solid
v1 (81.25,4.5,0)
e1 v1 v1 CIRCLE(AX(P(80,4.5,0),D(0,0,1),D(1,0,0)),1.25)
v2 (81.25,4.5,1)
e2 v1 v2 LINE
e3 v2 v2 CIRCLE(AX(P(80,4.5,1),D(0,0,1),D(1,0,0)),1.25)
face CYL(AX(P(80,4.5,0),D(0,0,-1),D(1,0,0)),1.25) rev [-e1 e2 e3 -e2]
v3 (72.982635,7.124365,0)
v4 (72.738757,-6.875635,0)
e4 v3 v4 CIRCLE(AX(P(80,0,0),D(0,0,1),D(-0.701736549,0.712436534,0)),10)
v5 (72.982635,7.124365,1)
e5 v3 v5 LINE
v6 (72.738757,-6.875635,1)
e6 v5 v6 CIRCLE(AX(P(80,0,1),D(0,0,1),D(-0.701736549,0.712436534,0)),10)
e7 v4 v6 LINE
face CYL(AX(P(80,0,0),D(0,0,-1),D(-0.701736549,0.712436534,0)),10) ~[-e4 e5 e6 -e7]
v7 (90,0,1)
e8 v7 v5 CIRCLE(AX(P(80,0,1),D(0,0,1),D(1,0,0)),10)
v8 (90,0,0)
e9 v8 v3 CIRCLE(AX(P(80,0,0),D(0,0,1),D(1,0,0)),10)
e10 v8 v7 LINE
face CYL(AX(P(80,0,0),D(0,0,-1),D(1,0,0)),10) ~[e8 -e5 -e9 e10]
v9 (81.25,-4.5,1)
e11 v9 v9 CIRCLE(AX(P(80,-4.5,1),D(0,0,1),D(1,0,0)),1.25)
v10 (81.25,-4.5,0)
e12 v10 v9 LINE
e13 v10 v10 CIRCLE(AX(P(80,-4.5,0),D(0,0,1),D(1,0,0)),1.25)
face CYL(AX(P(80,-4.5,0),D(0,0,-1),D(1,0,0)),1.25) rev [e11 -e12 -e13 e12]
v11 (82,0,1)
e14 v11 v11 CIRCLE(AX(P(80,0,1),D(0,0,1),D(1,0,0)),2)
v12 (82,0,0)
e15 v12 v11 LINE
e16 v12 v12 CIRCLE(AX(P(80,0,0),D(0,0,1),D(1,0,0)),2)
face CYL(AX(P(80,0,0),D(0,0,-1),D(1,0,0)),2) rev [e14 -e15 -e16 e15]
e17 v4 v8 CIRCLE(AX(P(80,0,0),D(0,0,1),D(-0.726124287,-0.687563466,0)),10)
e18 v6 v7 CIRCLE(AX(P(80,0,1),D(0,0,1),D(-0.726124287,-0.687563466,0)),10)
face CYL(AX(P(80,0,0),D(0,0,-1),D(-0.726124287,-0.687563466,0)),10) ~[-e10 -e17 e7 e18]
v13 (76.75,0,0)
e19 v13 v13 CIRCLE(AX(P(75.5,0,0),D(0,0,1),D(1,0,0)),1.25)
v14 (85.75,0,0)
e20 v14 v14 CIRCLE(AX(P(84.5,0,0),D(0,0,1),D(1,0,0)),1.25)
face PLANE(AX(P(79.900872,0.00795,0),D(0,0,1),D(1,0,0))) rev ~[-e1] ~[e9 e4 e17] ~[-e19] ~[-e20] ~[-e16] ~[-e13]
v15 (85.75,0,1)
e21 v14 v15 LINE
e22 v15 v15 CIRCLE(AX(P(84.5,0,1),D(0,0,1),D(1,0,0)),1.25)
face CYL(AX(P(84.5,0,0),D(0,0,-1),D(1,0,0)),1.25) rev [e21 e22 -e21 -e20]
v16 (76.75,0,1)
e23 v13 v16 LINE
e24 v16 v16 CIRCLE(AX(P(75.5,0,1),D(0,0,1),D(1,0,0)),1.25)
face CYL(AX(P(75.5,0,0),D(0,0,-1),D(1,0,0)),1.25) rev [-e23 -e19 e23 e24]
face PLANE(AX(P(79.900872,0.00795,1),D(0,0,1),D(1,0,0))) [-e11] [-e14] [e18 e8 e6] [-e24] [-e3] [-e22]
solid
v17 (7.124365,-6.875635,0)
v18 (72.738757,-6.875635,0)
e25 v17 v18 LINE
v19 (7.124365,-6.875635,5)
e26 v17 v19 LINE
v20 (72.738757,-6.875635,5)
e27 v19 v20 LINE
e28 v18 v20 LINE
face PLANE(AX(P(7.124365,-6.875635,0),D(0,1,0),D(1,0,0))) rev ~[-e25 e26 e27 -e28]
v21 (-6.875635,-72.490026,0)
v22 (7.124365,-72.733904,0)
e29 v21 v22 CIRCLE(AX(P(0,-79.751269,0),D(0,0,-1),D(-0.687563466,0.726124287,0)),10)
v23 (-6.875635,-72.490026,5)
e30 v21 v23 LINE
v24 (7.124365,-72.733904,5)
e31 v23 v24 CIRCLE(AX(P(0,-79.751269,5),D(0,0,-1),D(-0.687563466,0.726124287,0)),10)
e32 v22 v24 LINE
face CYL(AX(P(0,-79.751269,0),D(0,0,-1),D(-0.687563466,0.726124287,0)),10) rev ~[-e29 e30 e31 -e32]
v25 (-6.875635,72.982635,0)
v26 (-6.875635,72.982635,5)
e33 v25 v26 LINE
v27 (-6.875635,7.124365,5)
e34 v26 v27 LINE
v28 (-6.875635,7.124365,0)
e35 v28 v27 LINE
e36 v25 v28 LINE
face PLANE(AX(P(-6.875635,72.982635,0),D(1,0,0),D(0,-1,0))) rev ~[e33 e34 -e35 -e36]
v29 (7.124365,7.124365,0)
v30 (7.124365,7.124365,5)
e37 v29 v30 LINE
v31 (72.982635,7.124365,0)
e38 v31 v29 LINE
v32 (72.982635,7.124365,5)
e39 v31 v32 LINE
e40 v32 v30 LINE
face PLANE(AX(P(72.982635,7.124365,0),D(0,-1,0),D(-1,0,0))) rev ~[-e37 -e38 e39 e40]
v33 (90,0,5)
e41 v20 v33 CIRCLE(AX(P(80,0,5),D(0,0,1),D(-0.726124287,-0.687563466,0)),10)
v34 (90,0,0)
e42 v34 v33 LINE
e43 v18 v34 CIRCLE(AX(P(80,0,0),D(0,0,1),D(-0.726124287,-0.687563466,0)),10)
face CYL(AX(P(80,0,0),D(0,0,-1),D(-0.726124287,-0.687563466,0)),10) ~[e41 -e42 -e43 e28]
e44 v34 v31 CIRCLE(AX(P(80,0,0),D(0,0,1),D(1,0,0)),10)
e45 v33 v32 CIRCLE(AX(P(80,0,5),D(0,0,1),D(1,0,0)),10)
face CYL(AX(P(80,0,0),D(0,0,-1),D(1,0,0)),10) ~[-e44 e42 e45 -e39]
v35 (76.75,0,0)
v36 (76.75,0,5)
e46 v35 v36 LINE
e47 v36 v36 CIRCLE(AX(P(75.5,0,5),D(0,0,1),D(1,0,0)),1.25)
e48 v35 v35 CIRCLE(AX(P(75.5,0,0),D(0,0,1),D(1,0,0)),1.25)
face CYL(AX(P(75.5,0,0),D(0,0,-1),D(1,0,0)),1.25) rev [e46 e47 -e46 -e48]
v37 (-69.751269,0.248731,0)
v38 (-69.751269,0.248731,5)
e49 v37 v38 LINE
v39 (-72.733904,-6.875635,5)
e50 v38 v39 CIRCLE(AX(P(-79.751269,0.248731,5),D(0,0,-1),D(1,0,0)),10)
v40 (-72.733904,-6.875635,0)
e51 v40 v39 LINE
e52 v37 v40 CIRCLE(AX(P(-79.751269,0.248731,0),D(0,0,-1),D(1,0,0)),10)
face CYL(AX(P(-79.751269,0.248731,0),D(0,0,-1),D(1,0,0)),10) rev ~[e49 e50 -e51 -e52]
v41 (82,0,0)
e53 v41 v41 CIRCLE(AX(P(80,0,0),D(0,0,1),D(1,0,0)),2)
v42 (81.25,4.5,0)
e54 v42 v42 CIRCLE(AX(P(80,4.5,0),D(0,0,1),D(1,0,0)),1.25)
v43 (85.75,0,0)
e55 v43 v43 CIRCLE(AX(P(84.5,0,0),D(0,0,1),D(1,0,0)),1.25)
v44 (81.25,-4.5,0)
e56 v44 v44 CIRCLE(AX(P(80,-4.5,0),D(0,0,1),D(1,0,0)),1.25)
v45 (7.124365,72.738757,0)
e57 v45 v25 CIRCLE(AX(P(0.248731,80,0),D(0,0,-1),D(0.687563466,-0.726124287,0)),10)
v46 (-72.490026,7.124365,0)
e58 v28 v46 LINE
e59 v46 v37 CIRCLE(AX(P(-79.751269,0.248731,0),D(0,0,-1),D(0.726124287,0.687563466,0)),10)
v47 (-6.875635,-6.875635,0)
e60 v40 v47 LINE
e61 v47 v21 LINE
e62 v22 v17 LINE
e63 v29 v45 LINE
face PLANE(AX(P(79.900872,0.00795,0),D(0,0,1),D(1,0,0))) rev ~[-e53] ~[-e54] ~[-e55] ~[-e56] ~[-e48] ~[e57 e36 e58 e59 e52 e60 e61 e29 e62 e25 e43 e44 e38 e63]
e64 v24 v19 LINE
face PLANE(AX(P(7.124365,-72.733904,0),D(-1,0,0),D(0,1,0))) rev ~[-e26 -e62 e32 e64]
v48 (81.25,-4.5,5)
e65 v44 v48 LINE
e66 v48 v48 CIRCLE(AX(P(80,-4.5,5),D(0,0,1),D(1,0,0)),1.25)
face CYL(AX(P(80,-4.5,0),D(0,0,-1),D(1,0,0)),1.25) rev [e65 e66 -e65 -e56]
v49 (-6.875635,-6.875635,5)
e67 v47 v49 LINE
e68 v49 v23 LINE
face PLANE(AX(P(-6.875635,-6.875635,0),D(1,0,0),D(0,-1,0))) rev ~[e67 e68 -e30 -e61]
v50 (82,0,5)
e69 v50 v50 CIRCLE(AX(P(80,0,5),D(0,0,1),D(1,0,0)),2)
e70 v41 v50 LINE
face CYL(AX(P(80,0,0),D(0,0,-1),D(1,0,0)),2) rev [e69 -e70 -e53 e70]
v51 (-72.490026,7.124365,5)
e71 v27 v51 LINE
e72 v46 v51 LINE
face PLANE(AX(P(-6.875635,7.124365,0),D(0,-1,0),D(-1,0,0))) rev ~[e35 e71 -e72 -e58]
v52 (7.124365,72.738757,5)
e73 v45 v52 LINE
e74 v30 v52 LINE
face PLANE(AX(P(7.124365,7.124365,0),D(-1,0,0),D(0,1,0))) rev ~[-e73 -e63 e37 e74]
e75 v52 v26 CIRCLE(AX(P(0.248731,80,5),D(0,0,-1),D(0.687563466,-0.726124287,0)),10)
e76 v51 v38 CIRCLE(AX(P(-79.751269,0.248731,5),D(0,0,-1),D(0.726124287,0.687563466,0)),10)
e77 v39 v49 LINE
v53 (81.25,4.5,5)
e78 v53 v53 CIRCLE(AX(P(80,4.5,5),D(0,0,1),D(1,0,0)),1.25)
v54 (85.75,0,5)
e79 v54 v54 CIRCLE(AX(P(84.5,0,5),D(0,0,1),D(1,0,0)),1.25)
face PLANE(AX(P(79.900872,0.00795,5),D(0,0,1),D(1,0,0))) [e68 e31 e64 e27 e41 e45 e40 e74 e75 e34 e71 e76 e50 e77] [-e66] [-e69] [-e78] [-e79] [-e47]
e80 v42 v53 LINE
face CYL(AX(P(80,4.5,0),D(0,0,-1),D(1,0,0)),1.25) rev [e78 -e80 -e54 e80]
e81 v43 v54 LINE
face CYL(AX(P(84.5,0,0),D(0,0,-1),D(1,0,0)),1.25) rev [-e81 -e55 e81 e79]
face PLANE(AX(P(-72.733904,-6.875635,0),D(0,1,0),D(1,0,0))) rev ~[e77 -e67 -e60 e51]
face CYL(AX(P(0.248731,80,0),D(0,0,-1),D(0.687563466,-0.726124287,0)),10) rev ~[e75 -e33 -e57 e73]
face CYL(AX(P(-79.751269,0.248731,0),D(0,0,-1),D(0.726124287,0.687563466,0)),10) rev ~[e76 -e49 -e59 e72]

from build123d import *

# Parameters (mm, degrees)
F0_R     = 1.25
F0_R_2   = 2
F1_DEPTH = 5
F2_DEPTH = 1


with BuildPart() as f1:
    # F0 (on Top) → F1 (new body)
    with BuildSketch(Plane.XY):
        with BuildLine():
            ThreePointArc((72.7387571288, -6.8756346591), (83.7005115381, -9.2901137967), (90, 0))
            ThreePointArc((90, 0), (83.861757699, 9.2242521363), (72.9826345051, 7.1243653409))
            ThreePointArc((72.9826345051, 7.1243653409), (70.0015169041, 0.1741717018), (72.7387571288, -6.8756346591))
        make_face()
        with Locations((75.5, 0)):
            Circle(F0_R, mode=Mode.SUBTRACT)
        with Locations((80, -4.5)):
            Circle(F0_R, mode=Mode.SUBTRACT)
        with Locations((80, 0)):
            Circle(F0_R_2, mode=Mode.SUBTRACT)
        with Locations((84.5, 0)):
            Circle(F0_R, mode=Mode.SUBTRACT)
        with Locations((80, 4.5)):
            Circle(F0_R, mode=Mode.SUBTRACT)
        with BuildLine():
            ThreePointArc((72.7387571288, -6.8756346591), (70.0015169041, 0.1741717018), (72.9826345051, 7.1243653409))
            Line((72.9826345051, 7.1243653409), (7.1243653409, 7.1243653409))
            Line((7.1243653409, 7.1243653409), (7.1243653409, 0.2487306818))
            Line((7.1243653409, 0.2487306818), (7.1243653409, 0))
            Line((7.1243653409, 0), (7.1243653409, -6.8756346591))
            Line((7.1243653409, -6.8756346591), (72.7387571288, -6.8756346591))
        make_face()
        Polygon((7.1243653409, 0.2487306818), (7.1243653409, 7.1243653409), (0.2487306818, 7.1243653409), (0, 7.1243653409), (-6.8756346591, 7.1243653409), (-6.8756346591, 0.2487306818), (-6.8756346591, 0), (-6.8756346591, -6.8756346591), (0, -6.8756346591), (0.2487306818, -6.8756346591), (7.1243653409, -6.8756346591), (7.1243653409, 0), align=None)
        with BuildLine():
            Line((0.2487306818, 7.1243653409), (7.1243653409, 7.1243653409))
            Line((7.1243653409, 7.1243653409), (7.1243653409, 72.7387571288))
            ThreePointArc((7.1243653409, 72.7387571288), (0.0745589801, 70.0015169041), (-6.8756346591, 72.9826345051))
            Line((-6.8756346591, 72.9826345051), (-6.8756346591, 7.1243653409))
            Line((-6.8756346591, 7.1243653409), (0, 7.1243653409))
            Line((0, 7.1243653409), (0.2487306818, 7.1243653409))
        make_face()
        with BuildLine():
            Line((7.1243653409, -72.7339038233), (7.1243653409, -6.8756346591))
            Line((7.1243653409, -6.8756346591), (0.2487306818, -6.8756346591))
            Line((0.2487306818, -6.8756346591), (0, -6.8756346591))
            Line((0, -6.8756346591), (-6.8756346591, -6.8756346591))
            Line((-6.8756346591, -6.8756346591), (-6.8756346591, -72.4900264469))
            ThreePointArc((-6.8756346591, -72.4900264469), (0.1741717018, -69.7527862223), (7.1243653409, -72.7339038233))
        make_face()
        with BuildLine():
            Line((-6.8756346591, 0.2487306818), (-6.8756346591, 7.1243653409))
            Line((-6.8756346591, 7.1243653409), (-72.4900264469, 7.1243653409))
            ThreePointArc((-72.4900264469, 7.1243653409), (-70.4611555214, 3.94924222), (-69.7512693182, 0.2487306818))
            ThreePointArc((-69.7512693182, 0.2487306818), (-70.5270171818, -3.6130270171), (-72.7339038233, -6.8756346591))
            Line((-72.7339038233, -6.8756346591), (-6.8756346591, -6.8756346591))
            Line((-6.8756346591, -6.8756346591), (-6.8756346591, 0))
            Line((-6.8756346591, 0), (-6.8756346591, 0.2487306818))
        make_face()
    extrude(amount=F1_DEPTH)


with BuildPart() as f2:
    # F0 (on Top) → F2 (new body)
    with BuildSketch(Plane.XY):
        with BuildLine():
            ThreePointArc((72.7387571288, -6.8756346591), (83.7005115381, -9.2901137967), (90, 0))
            ThreePointArc((90, 0), (83.861757699, 9.2242521363), (72.9826345051, 7.1243653409))
            ThreePointArc((72.9826345051, 7.1243653409), (70.0015169041, 0.1741717018), (72.7387571288, -6.8756346591))
        make_face()
        with Locations((75.5, 0)):
            Circle(F0_R, mode=Mode.SUBTRACT)
        with Locations((80, -4.5)):
            Circle(F0_R, mode=Mode.SUBTRACT)
        with Locations((80, 0)):
            Circle(F0_R_2, mode=Mode.SUBTRACT)
        with Locations((84.5, 0)):
            Circle(F0_R, mode=Mode.SUBTRACT)
        with Locations((80, 4.5)):
            Circle(F0_R, mode=Mode.SUBTRACT)
    extrude(amount=F2_DEPTH)


solid = Compound([f1.part, f2.part])
